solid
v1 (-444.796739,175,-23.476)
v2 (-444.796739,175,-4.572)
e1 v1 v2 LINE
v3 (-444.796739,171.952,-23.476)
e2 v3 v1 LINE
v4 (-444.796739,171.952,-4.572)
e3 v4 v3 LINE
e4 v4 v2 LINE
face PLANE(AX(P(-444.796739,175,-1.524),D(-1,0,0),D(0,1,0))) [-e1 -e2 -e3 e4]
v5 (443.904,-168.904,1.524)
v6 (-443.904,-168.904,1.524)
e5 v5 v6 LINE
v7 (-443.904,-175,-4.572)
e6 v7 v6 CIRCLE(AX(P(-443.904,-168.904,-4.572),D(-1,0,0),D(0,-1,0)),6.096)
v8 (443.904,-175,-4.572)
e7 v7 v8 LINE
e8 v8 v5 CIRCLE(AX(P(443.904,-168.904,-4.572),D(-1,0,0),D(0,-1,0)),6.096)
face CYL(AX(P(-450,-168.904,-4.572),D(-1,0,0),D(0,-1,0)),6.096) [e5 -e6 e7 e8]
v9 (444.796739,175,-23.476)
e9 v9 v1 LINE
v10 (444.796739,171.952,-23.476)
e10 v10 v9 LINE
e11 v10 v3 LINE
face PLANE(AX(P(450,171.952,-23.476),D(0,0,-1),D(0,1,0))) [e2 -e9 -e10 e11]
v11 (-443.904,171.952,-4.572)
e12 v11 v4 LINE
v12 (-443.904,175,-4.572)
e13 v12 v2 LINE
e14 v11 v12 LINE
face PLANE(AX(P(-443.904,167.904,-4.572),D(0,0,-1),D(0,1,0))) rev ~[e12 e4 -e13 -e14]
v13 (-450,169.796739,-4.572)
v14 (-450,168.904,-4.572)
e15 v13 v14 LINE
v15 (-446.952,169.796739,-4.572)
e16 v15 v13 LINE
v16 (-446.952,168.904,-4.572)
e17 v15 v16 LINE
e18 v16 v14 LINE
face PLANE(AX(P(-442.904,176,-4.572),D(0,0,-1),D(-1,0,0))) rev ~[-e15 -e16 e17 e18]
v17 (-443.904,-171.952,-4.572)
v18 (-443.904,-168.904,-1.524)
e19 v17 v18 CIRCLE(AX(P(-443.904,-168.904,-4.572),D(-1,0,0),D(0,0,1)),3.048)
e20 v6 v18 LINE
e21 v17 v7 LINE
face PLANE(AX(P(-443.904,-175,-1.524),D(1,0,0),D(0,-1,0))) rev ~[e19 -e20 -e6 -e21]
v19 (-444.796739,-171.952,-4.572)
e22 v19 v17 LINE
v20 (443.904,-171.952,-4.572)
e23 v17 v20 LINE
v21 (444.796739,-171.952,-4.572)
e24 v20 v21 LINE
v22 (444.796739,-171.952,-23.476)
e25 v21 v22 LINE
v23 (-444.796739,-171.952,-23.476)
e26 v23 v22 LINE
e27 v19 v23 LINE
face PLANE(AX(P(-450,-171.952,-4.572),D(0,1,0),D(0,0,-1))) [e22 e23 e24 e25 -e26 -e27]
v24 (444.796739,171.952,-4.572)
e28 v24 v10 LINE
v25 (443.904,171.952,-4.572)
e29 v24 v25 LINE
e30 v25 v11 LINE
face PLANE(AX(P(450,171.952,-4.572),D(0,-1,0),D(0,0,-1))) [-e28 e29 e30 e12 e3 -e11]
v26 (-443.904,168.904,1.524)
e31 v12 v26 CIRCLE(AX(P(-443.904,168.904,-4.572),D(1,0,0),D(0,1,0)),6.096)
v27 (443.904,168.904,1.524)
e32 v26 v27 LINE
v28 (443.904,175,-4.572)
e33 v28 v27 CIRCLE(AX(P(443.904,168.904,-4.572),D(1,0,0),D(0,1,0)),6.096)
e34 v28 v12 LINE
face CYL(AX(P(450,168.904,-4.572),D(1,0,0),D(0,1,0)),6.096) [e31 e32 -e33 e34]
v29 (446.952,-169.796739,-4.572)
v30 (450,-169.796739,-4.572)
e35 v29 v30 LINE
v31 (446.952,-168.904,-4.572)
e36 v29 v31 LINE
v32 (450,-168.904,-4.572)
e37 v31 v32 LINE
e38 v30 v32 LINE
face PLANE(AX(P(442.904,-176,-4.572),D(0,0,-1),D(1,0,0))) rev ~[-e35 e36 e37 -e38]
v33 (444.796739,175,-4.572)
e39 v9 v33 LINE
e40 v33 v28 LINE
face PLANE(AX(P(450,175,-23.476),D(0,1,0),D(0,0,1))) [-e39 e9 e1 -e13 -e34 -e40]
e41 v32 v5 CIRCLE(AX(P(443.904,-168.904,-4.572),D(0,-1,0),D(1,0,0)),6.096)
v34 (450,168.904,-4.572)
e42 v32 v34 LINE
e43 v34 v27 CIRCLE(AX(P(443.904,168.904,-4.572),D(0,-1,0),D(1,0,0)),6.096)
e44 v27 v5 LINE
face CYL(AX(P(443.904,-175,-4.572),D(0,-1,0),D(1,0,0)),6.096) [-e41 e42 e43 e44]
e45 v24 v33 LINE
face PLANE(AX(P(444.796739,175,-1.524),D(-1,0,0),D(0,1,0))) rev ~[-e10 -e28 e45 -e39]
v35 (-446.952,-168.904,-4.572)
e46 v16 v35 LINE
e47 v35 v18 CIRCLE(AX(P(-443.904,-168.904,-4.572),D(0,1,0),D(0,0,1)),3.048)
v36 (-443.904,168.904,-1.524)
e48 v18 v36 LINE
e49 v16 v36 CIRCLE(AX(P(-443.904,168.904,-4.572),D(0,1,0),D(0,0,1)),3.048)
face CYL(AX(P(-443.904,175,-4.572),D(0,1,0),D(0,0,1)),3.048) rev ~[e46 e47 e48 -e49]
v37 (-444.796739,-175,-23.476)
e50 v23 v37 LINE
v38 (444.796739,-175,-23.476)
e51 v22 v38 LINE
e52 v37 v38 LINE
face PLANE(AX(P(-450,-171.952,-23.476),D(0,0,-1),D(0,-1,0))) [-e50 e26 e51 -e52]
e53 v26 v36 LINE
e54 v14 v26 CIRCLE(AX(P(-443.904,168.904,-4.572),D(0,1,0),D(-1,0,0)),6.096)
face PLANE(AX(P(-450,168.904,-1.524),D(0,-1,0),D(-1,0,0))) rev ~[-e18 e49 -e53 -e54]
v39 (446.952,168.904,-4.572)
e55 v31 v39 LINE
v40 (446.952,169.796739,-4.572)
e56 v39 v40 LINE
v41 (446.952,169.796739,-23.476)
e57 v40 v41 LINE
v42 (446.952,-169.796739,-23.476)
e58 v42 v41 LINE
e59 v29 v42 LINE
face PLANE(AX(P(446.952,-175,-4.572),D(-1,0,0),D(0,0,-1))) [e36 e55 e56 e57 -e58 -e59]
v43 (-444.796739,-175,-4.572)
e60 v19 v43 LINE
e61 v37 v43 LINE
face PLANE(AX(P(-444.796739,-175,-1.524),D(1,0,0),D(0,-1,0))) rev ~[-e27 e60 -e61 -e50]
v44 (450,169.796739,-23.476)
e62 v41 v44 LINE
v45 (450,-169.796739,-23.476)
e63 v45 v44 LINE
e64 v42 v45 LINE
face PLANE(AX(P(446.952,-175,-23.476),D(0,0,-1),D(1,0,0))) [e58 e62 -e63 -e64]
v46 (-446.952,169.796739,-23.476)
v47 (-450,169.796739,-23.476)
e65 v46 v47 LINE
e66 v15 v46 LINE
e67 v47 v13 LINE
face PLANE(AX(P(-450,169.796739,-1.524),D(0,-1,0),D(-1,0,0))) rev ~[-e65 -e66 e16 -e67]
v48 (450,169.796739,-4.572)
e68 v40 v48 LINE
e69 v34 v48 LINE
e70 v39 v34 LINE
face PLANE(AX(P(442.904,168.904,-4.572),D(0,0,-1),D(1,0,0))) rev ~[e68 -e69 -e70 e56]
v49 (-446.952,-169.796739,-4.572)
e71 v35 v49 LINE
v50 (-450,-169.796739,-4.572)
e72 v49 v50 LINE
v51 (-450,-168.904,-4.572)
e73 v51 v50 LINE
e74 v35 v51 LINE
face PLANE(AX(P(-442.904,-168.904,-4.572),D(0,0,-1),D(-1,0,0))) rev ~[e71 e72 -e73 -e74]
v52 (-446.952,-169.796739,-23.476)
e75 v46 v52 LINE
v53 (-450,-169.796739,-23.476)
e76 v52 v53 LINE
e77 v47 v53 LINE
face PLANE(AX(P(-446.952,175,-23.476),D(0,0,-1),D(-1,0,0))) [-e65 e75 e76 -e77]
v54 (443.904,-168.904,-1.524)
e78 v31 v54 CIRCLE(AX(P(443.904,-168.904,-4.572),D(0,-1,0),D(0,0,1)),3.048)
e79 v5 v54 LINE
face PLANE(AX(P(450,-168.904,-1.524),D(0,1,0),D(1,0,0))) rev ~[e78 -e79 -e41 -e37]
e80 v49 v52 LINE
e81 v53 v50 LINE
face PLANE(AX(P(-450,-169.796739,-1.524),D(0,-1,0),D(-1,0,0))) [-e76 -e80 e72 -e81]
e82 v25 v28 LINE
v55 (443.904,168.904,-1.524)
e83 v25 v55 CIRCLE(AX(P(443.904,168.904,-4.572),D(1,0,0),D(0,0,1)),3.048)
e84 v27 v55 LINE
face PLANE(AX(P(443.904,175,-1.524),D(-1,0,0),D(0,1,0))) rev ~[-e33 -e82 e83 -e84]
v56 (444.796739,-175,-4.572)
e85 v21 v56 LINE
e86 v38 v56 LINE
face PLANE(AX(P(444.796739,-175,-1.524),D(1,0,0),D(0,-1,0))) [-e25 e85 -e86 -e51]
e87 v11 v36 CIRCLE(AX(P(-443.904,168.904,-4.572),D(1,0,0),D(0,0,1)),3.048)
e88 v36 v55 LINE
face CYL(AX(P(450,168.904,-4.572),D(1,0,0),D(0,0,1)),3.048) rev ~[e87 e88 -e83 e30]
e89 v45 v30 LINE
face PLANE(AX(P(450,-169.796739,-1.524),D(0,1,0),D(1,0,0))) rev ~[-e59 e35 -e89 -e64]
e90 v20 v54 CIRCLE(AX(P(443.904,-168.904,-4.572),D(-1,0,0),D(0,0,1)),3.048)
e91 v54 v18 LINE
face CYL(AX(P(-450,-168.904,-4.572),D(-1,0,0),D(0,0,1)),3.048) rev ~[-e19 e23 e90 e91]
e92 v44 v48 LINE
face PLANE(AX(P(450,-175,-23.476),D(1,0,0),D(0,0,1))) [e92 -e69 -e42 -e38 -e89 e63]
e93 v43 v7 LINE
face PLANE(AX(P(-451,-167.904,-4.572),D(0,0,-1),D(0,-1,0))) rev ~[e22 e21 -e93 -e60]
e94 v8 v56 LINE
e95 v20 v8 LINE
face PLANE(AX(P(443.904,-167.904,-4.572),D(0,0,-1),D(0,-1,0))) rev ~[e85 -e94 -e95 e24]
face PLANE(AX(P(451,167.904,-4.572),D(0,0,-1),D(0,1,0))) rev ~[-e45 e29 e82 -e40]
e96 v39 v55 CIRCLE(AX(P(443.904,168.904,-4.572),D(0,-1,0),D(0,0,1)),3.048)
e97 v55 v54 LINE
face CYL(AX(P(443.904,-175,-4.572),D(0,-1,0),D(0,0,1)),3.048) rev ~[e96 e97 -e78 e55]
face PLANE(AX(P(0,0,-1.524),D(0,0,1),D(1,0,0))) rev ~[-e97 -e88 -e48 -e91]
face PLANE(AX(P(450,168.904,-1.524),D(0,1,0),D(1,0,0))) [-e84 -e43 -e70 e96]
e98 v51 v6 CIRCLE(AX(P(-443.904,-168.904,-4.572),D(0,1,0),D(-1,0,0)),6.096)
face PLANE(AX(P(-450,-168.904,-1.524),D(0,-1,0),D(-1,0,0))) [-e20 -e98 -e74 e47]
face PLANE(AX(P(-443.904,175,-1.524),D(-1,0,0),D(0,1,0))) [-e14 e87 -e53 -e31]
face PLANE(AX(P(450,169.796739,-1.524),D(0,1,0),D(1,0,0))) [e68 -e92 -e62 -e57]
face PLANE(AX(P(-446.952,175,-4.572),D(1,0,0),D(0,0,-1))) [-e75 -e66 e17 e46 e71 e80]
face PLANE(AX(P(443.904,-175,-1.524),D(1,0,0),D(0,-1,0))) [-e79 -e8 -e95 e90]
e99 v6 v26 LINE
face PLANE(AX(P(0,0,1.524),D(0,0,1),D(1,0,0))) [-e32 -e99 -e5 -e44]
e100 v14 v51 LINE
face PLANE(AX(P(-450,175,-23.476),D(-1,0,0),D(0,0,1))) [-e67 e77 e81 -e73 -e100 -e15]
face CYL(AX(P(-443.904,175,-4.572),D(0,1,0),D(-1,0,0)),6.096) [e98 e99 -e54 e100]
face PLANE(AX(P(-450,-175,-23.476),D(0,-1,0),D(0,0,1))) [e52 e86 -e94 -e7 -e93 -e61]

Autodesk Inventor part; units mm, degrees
ref_plane "YZ Plane" through (0, 0, 0) normal (1, 0, 0) x (0, 1, 0)
ref_plane "XZ Plane" through (0, 0, 0) normal (0, 1, 0) x (-1, 0, 0)
ref_plane "XY Plane" through (0, 0, 0) normal (0, 0, 1) x (1, 0, 0)
sketch "Sketch2" plane through (0, 0, 0) normal (0, 0, 1) x (1, 0, 0)
  line L0 (-450, -175) -> (450, -175)
  line L1 (450, -175) -> (450, 175)
  line L2 (450, 175) -> (-450, 175)
  line L3 (-450, 175) -> (-450, -175)
  line L4 (-450, -175) -> (450, 175) construction
  line L5 (450, -175) -> (-450, 175) construction
  point P0 (0, 0)
  dimension "d0" = 900
  dimension "d1" = 350
extrude "Plate1" add sketch "Sketch2" along normal mid plane 3.048
sketch "Sketch3" plane through (450, 171.952, 1.524) normal (0, 1, 0) x (-1, 0, 0)
  line L0 (900, 0) -> (0, 0)
  line L1 (0, 0) -> (0, -25)
  line L2 (0, -25) -> (900, -25)
  line L3 (900, -25) -> (900, 0)
edge flange "Flange1" height 25 angle 90 thickness 3.048 bend radius 3.048 thickness toward (0, 1, 0) relief tear relief width 3.048 relief depth 1.524 corner gap 3.048 corner form 2 edges at (0, 175, -1.524) (-450, 0, -1.524) (0, -175, -1.524) (450, 0, -1.524) wall of the first edge with corners at (-450, 171.952, 1.524) (450, 171.952, 1.524) (450, 171.952, -23.476) (-450, 171.952, -23.476)
bend "Bend1"
corner "Corner1"
equation "\"d2\" = Thickness"
equation "\"d3\" = BendReliefWidth"
equation "\"d4\" = BendReliefDepth"
equation "\"d5\" = MinimumRemnant"
equation "\"d6\" = TransitionRadius"
equation "\"d9\" = BendRadius"
equation "\"d10\" = CornerReliefSize"
equation "\"d11\" = GapSize"
equation "\"d12\" = JacobiRadiusSize"
equation "\"BendRadius\" = Thickness"
equation "\"BendReliefWidth\" = Thickness"
equation "\"BendReliefDepth\" = 0.5 * Thickness"
equation "\"CornerReliefSize\" = 4 * Thickness"
equation "\"MinimumRemnant\" = 2 * Thickness"
equation "\"TransitionRadius\" = BendRadius"
equation "\"JacobiRadiusSize\" = BendRadius"
equation "\"GapSize\" = Thickness"
equation "\"Space5\" = 0"
equation "\"Space6\" = 0"
equation "\"Space7\" = 0"
equation "\"Thickness\" = 3.048"
properties part number "TapaDown"
